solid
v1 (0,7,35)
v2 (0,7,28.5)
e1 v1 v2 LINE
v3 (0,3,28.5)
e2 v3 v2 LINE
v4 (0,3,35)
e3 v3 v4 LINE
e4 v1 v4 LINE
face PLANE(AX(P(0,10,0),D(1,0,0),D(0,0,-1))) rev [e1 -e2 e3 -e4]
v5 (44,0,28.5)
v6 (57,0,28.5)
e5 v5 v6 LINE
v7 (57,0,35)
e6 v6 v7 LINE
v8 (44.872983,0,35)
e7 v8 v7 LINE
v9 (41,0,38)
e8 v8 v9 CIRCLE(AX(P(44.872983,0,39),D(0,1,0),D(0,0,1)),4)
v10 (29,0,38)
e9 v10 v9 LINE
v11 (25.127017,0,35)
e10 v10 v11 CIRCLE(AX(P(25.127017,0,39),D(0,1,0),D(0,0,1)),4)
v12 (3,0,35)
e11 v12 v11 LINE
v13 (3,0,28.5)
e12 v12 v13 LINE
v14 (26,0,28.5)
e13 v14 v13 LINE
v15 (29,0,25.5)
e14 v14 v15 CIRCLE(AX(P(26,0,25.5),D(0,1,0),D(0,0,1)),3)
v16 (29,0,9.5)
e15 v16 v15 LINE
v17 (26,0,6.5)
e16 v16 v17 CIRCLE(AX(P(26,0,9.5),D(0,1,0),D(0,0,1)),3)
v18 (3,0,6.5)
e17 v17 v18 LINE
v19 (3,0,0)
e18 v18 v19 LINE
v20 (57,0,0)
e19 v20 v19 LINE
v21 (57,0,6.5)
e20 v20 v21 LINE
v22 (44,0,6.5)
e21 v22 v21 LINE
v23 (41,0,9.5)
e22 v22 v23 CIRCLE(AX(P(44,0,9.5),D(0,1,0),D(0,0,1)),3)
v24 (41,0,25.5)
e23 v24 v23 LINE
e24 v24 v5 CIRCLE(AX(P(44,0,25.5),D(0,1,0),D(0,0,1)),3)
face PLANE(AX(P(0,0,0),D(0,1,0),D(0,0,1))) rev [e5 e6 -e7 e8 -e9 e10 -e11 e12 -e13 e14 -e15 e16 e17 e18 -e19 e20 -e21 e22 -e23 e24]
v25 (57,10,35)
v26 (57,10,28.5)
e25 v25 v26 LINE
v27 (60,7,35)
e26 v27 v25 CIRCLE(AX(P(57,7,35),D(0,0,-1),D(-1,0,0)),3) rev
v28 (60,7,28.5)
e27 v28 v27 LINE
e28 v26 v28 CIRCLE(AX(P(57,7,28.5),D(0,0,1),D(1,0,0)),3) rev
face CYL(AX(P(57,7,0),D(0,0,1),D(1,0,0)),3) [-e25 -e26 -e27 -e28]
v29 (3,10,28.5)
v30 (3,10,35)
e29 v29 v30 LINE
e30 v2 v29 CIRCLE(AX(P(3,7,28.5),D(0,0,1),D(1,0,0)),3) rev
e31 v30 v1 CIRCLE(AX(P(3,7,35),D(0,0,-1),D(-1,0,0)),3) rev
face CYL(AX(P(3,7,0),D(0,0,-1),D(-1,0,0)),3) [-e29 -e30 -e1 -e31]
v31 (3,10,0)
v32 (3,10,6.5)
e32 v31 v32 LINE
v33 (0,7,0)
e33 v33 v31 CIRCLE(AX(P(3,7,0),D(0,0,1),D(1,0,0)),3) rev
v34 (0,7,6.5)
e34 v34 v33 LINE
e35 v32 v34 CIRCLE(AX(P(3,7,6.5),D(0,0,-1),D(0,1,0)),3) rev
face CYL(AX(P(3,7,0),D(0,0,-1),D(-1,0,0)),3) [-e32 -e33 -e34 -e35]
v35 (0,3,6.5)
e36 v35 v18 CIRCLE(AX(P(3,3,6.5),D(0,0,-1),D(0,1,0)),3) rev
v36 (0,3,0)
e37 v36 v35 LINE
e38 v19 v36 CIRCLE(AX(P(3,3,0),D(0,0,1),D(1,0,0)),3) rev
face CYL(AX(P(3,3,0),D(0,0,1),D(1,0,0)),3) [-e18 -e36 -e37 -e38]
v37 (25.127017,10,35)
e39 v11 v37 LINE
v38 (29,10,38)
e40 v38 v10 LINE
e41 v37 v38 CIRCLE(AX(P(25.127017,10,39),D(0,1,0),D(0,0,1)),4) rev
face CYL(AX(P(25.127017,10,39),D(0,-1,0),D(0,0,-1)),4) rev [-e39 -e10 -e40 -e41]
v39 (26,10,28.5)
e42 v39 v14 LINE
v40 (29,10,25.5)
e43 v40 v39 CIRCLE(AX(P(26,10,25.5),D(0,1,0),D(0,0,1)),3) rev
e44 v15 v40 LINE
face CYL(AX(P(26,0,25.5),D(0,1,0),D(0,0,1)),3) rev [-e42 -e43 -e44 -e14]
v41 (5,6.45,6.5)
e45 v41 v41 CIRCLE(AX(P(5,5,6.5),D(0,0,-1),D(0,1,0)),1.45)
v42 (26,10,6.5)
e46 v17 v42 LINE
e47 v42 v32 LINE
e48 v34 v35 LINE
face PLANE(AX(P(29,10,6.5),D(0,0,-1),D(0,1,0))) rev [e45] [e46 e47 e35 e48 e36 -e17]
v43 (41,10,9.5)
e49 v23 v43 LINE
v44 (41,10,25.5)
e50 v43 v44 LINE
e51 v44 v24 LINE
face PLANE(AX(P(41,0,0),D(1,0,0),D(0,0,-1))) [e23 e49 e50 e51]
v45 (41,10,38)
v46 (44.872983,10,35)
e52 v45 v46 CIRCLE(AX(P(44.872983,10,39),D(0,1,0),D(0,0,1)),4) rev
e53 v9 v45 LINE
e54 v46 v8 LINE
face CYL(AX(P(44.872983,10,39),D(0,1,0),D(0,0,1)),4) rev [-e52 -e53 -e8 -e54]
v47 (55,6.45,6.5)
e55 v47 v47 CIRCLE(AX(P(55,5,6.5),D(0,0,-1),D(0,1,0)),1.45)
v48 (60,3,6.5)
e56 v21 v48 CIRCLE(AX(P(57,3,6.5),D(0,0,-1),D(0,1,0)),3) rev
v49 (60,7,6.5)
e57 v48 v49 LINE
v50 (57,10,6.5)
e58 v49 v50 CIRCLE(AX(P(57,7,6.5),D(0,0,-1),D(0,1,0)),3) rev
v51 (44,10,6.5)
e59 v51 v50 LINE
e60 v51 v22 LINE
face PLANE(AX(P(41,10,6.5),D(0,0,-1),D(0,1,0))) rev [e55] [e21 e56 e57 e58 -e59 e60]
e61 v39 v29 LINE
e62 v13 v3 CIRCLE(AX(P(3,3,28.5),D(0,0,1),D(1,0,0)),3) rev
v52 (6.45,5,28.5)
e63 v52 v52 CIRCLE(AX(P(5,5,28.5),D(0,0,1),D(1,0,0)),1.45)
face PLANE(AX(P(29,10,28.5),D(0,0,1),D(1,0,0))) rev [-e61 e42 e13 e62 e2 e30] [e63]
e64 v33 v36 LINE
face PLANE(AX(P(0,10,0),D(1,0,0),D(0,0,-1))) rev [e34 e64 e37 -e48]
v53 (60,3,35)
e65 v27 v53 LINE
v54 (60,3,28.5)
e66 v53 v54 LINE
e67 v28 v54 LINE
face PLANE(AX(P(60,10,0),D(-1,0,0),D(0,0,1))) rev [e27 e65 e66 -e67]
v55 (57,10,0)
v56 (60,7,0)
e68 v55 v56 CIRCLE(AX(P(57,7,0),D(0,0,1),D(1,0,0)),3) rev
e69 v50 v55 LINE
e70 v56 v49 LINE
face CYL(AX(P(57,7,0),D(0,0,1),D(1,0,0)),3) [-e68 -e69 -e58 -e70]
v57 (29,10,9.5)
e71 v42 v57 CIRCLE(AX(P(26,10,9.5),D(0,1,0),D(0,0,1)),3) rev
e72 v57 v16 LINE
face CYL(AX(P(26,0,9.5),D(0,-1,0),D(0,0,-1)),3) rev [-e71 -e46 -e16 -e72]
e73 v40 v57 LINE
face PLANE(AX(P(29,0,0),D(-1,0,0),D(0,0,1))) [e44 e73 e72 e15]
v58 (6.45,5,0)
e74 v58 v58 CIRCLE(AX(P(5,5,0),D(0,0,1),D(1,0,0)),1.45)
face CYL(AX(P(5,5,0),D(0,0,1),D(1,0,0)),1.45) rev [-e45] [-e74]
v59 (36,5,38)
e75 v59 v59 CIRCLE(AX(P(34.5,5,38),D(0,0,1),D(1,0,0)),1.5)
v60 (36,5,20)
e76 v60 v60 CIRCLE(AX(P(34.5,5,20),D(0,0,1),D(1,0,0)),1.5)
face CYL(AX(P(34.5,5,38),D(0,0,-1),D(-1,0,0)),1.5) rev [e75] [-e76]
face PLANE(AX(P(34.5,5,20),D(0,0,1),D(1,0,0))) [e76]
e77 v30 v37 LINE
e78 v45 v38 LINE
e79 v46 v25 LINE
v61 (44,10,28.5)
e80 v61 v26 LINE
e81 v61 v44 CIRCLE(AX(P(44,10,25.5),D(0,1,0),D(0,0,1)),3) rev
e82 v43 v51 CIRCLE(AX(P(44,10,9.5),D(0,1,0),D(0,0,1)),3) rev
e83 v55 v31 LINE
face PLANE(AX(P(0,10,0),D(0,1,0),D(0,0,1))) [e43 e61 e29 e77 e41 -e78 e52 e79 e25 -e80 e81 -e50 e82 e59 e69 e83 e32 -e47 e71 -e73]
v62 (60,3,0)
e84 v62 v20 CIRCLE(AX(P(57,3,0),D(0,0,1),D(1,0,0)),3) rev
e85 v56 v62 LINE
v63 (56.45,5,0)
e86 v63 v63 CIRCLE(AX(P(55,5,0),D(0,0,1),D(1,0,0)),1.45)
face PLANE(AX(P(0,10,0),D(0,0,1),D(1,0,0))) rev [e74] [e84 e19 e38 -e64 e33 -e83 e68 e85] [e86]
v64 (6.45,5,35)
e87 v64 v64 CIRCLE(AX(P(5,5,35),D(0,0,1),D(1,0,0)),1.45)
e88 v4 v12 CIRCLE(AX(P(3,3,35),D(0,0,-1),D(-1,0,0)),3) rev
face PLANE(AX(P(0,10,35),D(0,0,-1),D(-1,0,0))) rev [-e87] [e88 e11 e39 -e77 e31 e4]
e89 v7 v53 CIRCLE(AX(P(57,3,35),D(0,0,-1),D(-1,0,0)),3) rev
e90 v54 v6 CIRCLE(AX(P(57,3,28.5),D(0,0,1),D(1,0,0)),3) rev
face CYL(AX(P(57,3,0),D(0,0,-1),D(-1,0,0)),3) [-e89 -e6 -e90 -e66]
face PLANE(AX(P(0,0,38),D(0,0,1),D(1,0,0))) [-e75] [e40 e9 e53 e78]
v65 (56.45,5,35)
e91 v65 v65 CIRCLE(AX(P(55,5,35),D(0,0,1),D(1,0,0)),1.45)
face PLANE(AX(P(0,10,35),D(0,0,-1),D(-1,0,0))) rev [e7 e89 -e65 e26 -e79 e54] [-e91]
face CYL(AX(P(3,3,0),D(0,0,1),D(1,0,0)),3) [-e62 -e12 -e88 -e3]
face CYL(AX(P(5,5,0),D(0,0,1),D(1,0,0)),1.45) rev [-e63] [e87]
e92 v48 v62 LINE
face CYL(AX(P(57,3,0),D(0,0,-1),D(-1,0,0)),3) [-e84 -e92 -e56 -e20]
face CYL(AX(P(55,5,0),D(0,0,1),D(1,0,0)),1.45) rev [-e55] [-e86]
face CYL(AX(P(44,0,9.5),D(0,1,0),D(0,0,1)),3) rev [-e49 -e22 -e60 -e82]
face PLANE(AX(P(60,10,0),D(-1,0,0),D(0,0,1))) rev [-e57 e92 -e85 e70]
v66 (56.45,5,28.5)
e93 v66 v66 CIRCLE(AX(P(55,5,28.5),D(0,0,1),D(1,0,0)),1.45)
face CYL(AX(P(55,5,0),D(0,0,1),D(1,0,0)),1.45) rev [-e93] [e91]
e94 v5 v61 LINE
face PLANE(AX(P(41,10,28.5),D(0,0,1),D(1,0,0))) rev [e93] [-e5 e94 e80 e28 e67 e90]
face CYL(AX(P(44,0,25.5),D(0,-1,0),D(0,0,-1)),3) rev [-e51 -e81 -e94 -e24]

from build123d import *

# Parameters (mm, degrees)
SKETCH1_W               = 60
SKETCH1_H               = 35
BOSS_EXTRUDE1_DEPTH     = 10
SKETCH2_W               = 22
SKETCH2_H               = 10
CUT_EXTRUDE1_DEPTH      = 19
SKETCH3_W               = 22
SKETCH3_H               = 10
CUT_EXTRUDE2_DEPTH      = 29
SKETCH5_R               = 1.45
CUT_EXTRUDE4_DEPTH      = 71.178344238
FILLET1_R               = 3
FILLET2_R               = 3
SKETCH7_W               = 12
SKETCH7_H               = 10
BOSS_EXTRUDE2_DEPTH     = 3
CUT_EXTRUDE5_DEPTH      = 3
CUT_EXTRUDE5_DEPTH_BACK = 15
SKETCH6_R               = 1.5
FILLET3_R               = 4


with BuildPart() as part:
    # Sketch1 → Boss-Extrude1 (new body)
    with BuildSketch(Plane(origin=(0, 0, 0), x_dir=(1, 0, 0), z_dir=(0, 1, 0))):
        with Locations((30, -17.5)):
            Rectangle(SKETCH1_W, SKETCH1_H)
    extrude(amount=BOSS_EXTRUDE1_DEPTH)

    # Sketch2 → Cut-Extrude1 (cut)
    with BuildSketch(Plane(origin=(60, 0, 0), x_dir=(0, 0, -1), z_dir=(1, 0, 0))):
        with Locations((-17.5, 5)):
            Rectangle(SKETCH2_W, SKETCH2_H)
    extrude(amount=-CUT_EXTRUDE1_DEPTH, mode=Mode.SUBTRACT)

    # Sketch3 → Cut-Extrude2 (cut)
    with BuildSketch(Plane.ZY):
        with Locations((17.5, 5)):
            Rectangle(SKETCH3_W, SKETCH3_H)
    extrude(amount=-CUT_EXTRUDE2_DEPTH, mode=Mode.SUBTRACT)

    # Sketch5 → Cut-Extrude4 (cut, through all)
    with BuildSketch(Plane.XY.offset(35)):
        with Locations((5, 5)):
            Circle(SKETCH5_R)
        with Locations((55, 5)):
            Circle(SKETCH5_R)
    extrude(amount=-CUT_EXTRUDE4_DEPTH, mode=Mode.SUBTRACT)

    # Fillet1
    fillet1_edges = [part.edges().sort_by_distance(p)[0] for p in [
        (60, 10, 31.75),
        (60, 0, 3.25),
        (60, 10, 3.25),
        (0, 0, 31.75),
        (0, 10, 31.75),
        (0, 10, 3.25),
        (60, 0, 31.75),
        (0, 0, 3.25),
    ]]
    fillet(fillet1_edges, radius=FILLET1_R)

    # Fillet2
    fillet2_edges = [part.edges().sort_by_distance(p)[0] for p in [
        (41, 5, 28.5),
        (41, 5, 6.5),
        (29, 5, 6.5),
        (29, 5, 28.5),
    ]]
    fillet(fillet2_edges, radius=FILLET2_R)

    # Sketch7 → Boss-Extrude2 (add)
    with BuildSketch(Plane.XY.offset(35)):
        with Locations((35, 5)):
            Rectangle(SKETCH7_W, SKETCH7_H)
    extrude(amount=BOSS_EXTRUDE2_DEPTH)

    # Sketch6 → Cut-Extrude5 (cut, two sides: drawn at the far end of the back side and taken through both)
    with BuildSketch(Plane.XY.offset(35).offset(-CUT_EXTRUDE5_DEPTH_BACK)):
        with Locations((34.5, 5)):
            Circle(SKETCH6_R)
    extrude(amount=CUT_EXTRUDE5_DEPTH + CUT_EXTRUDE5_DEPTH_BACK, mode=Mode.SUBTRACT)

    # Fillet3
    # the kernel refuses this fillet: 4 mm, written as the material it adds along each edge
    with BuildSketch(Plane(origin=(41, 10, 35), x_dir=(0, 0, 1), z_dir=(0, -1, 0))) as fillet3_piece_1:
        with BuildLine():
            CenterArc((4, -3.872983346), FILLET3_R, 104.477512186, 75.522487814)
            Line((0, -3.872983346), (-0.08, -3.872983346))
            Line((-0.08, -3.872983346), (-0.08, 0))
            Line((-0.08, 0), (0, 0.08))
            ThreePointArc((0, 0.08), (1.5, 0.08), (2.98, 0.077459667))
            Line((2.98, 0.077459667), (3, 0))
        make_face()
    extrude(amount=10)
    with BuildSketch(Plane(origin=(29, 0, 35), x_dir=(-1, 0, 0), z_dir=(0, 1, 0))) as fillet3_piece_2:
        with BuildLine():
            CenterArc((3.872983346, 4), FILLET3_R, 194.477512186, 75.522487814)
            Line((0, 3), (-0.077459667, 2.98))
            ThreePointArc((-0.077459667, 2.98), (-0.08, 1.5), (-0.08, 0))
            Line((-0.08, 0), (0, -0.08))
            Line((0, -0.08), (3.872983346, -0.08))
            Line((3.872983346, -0.08), (3.872983346, 0))
        make_face()
    extrude(amount=10)


solid = part.part
